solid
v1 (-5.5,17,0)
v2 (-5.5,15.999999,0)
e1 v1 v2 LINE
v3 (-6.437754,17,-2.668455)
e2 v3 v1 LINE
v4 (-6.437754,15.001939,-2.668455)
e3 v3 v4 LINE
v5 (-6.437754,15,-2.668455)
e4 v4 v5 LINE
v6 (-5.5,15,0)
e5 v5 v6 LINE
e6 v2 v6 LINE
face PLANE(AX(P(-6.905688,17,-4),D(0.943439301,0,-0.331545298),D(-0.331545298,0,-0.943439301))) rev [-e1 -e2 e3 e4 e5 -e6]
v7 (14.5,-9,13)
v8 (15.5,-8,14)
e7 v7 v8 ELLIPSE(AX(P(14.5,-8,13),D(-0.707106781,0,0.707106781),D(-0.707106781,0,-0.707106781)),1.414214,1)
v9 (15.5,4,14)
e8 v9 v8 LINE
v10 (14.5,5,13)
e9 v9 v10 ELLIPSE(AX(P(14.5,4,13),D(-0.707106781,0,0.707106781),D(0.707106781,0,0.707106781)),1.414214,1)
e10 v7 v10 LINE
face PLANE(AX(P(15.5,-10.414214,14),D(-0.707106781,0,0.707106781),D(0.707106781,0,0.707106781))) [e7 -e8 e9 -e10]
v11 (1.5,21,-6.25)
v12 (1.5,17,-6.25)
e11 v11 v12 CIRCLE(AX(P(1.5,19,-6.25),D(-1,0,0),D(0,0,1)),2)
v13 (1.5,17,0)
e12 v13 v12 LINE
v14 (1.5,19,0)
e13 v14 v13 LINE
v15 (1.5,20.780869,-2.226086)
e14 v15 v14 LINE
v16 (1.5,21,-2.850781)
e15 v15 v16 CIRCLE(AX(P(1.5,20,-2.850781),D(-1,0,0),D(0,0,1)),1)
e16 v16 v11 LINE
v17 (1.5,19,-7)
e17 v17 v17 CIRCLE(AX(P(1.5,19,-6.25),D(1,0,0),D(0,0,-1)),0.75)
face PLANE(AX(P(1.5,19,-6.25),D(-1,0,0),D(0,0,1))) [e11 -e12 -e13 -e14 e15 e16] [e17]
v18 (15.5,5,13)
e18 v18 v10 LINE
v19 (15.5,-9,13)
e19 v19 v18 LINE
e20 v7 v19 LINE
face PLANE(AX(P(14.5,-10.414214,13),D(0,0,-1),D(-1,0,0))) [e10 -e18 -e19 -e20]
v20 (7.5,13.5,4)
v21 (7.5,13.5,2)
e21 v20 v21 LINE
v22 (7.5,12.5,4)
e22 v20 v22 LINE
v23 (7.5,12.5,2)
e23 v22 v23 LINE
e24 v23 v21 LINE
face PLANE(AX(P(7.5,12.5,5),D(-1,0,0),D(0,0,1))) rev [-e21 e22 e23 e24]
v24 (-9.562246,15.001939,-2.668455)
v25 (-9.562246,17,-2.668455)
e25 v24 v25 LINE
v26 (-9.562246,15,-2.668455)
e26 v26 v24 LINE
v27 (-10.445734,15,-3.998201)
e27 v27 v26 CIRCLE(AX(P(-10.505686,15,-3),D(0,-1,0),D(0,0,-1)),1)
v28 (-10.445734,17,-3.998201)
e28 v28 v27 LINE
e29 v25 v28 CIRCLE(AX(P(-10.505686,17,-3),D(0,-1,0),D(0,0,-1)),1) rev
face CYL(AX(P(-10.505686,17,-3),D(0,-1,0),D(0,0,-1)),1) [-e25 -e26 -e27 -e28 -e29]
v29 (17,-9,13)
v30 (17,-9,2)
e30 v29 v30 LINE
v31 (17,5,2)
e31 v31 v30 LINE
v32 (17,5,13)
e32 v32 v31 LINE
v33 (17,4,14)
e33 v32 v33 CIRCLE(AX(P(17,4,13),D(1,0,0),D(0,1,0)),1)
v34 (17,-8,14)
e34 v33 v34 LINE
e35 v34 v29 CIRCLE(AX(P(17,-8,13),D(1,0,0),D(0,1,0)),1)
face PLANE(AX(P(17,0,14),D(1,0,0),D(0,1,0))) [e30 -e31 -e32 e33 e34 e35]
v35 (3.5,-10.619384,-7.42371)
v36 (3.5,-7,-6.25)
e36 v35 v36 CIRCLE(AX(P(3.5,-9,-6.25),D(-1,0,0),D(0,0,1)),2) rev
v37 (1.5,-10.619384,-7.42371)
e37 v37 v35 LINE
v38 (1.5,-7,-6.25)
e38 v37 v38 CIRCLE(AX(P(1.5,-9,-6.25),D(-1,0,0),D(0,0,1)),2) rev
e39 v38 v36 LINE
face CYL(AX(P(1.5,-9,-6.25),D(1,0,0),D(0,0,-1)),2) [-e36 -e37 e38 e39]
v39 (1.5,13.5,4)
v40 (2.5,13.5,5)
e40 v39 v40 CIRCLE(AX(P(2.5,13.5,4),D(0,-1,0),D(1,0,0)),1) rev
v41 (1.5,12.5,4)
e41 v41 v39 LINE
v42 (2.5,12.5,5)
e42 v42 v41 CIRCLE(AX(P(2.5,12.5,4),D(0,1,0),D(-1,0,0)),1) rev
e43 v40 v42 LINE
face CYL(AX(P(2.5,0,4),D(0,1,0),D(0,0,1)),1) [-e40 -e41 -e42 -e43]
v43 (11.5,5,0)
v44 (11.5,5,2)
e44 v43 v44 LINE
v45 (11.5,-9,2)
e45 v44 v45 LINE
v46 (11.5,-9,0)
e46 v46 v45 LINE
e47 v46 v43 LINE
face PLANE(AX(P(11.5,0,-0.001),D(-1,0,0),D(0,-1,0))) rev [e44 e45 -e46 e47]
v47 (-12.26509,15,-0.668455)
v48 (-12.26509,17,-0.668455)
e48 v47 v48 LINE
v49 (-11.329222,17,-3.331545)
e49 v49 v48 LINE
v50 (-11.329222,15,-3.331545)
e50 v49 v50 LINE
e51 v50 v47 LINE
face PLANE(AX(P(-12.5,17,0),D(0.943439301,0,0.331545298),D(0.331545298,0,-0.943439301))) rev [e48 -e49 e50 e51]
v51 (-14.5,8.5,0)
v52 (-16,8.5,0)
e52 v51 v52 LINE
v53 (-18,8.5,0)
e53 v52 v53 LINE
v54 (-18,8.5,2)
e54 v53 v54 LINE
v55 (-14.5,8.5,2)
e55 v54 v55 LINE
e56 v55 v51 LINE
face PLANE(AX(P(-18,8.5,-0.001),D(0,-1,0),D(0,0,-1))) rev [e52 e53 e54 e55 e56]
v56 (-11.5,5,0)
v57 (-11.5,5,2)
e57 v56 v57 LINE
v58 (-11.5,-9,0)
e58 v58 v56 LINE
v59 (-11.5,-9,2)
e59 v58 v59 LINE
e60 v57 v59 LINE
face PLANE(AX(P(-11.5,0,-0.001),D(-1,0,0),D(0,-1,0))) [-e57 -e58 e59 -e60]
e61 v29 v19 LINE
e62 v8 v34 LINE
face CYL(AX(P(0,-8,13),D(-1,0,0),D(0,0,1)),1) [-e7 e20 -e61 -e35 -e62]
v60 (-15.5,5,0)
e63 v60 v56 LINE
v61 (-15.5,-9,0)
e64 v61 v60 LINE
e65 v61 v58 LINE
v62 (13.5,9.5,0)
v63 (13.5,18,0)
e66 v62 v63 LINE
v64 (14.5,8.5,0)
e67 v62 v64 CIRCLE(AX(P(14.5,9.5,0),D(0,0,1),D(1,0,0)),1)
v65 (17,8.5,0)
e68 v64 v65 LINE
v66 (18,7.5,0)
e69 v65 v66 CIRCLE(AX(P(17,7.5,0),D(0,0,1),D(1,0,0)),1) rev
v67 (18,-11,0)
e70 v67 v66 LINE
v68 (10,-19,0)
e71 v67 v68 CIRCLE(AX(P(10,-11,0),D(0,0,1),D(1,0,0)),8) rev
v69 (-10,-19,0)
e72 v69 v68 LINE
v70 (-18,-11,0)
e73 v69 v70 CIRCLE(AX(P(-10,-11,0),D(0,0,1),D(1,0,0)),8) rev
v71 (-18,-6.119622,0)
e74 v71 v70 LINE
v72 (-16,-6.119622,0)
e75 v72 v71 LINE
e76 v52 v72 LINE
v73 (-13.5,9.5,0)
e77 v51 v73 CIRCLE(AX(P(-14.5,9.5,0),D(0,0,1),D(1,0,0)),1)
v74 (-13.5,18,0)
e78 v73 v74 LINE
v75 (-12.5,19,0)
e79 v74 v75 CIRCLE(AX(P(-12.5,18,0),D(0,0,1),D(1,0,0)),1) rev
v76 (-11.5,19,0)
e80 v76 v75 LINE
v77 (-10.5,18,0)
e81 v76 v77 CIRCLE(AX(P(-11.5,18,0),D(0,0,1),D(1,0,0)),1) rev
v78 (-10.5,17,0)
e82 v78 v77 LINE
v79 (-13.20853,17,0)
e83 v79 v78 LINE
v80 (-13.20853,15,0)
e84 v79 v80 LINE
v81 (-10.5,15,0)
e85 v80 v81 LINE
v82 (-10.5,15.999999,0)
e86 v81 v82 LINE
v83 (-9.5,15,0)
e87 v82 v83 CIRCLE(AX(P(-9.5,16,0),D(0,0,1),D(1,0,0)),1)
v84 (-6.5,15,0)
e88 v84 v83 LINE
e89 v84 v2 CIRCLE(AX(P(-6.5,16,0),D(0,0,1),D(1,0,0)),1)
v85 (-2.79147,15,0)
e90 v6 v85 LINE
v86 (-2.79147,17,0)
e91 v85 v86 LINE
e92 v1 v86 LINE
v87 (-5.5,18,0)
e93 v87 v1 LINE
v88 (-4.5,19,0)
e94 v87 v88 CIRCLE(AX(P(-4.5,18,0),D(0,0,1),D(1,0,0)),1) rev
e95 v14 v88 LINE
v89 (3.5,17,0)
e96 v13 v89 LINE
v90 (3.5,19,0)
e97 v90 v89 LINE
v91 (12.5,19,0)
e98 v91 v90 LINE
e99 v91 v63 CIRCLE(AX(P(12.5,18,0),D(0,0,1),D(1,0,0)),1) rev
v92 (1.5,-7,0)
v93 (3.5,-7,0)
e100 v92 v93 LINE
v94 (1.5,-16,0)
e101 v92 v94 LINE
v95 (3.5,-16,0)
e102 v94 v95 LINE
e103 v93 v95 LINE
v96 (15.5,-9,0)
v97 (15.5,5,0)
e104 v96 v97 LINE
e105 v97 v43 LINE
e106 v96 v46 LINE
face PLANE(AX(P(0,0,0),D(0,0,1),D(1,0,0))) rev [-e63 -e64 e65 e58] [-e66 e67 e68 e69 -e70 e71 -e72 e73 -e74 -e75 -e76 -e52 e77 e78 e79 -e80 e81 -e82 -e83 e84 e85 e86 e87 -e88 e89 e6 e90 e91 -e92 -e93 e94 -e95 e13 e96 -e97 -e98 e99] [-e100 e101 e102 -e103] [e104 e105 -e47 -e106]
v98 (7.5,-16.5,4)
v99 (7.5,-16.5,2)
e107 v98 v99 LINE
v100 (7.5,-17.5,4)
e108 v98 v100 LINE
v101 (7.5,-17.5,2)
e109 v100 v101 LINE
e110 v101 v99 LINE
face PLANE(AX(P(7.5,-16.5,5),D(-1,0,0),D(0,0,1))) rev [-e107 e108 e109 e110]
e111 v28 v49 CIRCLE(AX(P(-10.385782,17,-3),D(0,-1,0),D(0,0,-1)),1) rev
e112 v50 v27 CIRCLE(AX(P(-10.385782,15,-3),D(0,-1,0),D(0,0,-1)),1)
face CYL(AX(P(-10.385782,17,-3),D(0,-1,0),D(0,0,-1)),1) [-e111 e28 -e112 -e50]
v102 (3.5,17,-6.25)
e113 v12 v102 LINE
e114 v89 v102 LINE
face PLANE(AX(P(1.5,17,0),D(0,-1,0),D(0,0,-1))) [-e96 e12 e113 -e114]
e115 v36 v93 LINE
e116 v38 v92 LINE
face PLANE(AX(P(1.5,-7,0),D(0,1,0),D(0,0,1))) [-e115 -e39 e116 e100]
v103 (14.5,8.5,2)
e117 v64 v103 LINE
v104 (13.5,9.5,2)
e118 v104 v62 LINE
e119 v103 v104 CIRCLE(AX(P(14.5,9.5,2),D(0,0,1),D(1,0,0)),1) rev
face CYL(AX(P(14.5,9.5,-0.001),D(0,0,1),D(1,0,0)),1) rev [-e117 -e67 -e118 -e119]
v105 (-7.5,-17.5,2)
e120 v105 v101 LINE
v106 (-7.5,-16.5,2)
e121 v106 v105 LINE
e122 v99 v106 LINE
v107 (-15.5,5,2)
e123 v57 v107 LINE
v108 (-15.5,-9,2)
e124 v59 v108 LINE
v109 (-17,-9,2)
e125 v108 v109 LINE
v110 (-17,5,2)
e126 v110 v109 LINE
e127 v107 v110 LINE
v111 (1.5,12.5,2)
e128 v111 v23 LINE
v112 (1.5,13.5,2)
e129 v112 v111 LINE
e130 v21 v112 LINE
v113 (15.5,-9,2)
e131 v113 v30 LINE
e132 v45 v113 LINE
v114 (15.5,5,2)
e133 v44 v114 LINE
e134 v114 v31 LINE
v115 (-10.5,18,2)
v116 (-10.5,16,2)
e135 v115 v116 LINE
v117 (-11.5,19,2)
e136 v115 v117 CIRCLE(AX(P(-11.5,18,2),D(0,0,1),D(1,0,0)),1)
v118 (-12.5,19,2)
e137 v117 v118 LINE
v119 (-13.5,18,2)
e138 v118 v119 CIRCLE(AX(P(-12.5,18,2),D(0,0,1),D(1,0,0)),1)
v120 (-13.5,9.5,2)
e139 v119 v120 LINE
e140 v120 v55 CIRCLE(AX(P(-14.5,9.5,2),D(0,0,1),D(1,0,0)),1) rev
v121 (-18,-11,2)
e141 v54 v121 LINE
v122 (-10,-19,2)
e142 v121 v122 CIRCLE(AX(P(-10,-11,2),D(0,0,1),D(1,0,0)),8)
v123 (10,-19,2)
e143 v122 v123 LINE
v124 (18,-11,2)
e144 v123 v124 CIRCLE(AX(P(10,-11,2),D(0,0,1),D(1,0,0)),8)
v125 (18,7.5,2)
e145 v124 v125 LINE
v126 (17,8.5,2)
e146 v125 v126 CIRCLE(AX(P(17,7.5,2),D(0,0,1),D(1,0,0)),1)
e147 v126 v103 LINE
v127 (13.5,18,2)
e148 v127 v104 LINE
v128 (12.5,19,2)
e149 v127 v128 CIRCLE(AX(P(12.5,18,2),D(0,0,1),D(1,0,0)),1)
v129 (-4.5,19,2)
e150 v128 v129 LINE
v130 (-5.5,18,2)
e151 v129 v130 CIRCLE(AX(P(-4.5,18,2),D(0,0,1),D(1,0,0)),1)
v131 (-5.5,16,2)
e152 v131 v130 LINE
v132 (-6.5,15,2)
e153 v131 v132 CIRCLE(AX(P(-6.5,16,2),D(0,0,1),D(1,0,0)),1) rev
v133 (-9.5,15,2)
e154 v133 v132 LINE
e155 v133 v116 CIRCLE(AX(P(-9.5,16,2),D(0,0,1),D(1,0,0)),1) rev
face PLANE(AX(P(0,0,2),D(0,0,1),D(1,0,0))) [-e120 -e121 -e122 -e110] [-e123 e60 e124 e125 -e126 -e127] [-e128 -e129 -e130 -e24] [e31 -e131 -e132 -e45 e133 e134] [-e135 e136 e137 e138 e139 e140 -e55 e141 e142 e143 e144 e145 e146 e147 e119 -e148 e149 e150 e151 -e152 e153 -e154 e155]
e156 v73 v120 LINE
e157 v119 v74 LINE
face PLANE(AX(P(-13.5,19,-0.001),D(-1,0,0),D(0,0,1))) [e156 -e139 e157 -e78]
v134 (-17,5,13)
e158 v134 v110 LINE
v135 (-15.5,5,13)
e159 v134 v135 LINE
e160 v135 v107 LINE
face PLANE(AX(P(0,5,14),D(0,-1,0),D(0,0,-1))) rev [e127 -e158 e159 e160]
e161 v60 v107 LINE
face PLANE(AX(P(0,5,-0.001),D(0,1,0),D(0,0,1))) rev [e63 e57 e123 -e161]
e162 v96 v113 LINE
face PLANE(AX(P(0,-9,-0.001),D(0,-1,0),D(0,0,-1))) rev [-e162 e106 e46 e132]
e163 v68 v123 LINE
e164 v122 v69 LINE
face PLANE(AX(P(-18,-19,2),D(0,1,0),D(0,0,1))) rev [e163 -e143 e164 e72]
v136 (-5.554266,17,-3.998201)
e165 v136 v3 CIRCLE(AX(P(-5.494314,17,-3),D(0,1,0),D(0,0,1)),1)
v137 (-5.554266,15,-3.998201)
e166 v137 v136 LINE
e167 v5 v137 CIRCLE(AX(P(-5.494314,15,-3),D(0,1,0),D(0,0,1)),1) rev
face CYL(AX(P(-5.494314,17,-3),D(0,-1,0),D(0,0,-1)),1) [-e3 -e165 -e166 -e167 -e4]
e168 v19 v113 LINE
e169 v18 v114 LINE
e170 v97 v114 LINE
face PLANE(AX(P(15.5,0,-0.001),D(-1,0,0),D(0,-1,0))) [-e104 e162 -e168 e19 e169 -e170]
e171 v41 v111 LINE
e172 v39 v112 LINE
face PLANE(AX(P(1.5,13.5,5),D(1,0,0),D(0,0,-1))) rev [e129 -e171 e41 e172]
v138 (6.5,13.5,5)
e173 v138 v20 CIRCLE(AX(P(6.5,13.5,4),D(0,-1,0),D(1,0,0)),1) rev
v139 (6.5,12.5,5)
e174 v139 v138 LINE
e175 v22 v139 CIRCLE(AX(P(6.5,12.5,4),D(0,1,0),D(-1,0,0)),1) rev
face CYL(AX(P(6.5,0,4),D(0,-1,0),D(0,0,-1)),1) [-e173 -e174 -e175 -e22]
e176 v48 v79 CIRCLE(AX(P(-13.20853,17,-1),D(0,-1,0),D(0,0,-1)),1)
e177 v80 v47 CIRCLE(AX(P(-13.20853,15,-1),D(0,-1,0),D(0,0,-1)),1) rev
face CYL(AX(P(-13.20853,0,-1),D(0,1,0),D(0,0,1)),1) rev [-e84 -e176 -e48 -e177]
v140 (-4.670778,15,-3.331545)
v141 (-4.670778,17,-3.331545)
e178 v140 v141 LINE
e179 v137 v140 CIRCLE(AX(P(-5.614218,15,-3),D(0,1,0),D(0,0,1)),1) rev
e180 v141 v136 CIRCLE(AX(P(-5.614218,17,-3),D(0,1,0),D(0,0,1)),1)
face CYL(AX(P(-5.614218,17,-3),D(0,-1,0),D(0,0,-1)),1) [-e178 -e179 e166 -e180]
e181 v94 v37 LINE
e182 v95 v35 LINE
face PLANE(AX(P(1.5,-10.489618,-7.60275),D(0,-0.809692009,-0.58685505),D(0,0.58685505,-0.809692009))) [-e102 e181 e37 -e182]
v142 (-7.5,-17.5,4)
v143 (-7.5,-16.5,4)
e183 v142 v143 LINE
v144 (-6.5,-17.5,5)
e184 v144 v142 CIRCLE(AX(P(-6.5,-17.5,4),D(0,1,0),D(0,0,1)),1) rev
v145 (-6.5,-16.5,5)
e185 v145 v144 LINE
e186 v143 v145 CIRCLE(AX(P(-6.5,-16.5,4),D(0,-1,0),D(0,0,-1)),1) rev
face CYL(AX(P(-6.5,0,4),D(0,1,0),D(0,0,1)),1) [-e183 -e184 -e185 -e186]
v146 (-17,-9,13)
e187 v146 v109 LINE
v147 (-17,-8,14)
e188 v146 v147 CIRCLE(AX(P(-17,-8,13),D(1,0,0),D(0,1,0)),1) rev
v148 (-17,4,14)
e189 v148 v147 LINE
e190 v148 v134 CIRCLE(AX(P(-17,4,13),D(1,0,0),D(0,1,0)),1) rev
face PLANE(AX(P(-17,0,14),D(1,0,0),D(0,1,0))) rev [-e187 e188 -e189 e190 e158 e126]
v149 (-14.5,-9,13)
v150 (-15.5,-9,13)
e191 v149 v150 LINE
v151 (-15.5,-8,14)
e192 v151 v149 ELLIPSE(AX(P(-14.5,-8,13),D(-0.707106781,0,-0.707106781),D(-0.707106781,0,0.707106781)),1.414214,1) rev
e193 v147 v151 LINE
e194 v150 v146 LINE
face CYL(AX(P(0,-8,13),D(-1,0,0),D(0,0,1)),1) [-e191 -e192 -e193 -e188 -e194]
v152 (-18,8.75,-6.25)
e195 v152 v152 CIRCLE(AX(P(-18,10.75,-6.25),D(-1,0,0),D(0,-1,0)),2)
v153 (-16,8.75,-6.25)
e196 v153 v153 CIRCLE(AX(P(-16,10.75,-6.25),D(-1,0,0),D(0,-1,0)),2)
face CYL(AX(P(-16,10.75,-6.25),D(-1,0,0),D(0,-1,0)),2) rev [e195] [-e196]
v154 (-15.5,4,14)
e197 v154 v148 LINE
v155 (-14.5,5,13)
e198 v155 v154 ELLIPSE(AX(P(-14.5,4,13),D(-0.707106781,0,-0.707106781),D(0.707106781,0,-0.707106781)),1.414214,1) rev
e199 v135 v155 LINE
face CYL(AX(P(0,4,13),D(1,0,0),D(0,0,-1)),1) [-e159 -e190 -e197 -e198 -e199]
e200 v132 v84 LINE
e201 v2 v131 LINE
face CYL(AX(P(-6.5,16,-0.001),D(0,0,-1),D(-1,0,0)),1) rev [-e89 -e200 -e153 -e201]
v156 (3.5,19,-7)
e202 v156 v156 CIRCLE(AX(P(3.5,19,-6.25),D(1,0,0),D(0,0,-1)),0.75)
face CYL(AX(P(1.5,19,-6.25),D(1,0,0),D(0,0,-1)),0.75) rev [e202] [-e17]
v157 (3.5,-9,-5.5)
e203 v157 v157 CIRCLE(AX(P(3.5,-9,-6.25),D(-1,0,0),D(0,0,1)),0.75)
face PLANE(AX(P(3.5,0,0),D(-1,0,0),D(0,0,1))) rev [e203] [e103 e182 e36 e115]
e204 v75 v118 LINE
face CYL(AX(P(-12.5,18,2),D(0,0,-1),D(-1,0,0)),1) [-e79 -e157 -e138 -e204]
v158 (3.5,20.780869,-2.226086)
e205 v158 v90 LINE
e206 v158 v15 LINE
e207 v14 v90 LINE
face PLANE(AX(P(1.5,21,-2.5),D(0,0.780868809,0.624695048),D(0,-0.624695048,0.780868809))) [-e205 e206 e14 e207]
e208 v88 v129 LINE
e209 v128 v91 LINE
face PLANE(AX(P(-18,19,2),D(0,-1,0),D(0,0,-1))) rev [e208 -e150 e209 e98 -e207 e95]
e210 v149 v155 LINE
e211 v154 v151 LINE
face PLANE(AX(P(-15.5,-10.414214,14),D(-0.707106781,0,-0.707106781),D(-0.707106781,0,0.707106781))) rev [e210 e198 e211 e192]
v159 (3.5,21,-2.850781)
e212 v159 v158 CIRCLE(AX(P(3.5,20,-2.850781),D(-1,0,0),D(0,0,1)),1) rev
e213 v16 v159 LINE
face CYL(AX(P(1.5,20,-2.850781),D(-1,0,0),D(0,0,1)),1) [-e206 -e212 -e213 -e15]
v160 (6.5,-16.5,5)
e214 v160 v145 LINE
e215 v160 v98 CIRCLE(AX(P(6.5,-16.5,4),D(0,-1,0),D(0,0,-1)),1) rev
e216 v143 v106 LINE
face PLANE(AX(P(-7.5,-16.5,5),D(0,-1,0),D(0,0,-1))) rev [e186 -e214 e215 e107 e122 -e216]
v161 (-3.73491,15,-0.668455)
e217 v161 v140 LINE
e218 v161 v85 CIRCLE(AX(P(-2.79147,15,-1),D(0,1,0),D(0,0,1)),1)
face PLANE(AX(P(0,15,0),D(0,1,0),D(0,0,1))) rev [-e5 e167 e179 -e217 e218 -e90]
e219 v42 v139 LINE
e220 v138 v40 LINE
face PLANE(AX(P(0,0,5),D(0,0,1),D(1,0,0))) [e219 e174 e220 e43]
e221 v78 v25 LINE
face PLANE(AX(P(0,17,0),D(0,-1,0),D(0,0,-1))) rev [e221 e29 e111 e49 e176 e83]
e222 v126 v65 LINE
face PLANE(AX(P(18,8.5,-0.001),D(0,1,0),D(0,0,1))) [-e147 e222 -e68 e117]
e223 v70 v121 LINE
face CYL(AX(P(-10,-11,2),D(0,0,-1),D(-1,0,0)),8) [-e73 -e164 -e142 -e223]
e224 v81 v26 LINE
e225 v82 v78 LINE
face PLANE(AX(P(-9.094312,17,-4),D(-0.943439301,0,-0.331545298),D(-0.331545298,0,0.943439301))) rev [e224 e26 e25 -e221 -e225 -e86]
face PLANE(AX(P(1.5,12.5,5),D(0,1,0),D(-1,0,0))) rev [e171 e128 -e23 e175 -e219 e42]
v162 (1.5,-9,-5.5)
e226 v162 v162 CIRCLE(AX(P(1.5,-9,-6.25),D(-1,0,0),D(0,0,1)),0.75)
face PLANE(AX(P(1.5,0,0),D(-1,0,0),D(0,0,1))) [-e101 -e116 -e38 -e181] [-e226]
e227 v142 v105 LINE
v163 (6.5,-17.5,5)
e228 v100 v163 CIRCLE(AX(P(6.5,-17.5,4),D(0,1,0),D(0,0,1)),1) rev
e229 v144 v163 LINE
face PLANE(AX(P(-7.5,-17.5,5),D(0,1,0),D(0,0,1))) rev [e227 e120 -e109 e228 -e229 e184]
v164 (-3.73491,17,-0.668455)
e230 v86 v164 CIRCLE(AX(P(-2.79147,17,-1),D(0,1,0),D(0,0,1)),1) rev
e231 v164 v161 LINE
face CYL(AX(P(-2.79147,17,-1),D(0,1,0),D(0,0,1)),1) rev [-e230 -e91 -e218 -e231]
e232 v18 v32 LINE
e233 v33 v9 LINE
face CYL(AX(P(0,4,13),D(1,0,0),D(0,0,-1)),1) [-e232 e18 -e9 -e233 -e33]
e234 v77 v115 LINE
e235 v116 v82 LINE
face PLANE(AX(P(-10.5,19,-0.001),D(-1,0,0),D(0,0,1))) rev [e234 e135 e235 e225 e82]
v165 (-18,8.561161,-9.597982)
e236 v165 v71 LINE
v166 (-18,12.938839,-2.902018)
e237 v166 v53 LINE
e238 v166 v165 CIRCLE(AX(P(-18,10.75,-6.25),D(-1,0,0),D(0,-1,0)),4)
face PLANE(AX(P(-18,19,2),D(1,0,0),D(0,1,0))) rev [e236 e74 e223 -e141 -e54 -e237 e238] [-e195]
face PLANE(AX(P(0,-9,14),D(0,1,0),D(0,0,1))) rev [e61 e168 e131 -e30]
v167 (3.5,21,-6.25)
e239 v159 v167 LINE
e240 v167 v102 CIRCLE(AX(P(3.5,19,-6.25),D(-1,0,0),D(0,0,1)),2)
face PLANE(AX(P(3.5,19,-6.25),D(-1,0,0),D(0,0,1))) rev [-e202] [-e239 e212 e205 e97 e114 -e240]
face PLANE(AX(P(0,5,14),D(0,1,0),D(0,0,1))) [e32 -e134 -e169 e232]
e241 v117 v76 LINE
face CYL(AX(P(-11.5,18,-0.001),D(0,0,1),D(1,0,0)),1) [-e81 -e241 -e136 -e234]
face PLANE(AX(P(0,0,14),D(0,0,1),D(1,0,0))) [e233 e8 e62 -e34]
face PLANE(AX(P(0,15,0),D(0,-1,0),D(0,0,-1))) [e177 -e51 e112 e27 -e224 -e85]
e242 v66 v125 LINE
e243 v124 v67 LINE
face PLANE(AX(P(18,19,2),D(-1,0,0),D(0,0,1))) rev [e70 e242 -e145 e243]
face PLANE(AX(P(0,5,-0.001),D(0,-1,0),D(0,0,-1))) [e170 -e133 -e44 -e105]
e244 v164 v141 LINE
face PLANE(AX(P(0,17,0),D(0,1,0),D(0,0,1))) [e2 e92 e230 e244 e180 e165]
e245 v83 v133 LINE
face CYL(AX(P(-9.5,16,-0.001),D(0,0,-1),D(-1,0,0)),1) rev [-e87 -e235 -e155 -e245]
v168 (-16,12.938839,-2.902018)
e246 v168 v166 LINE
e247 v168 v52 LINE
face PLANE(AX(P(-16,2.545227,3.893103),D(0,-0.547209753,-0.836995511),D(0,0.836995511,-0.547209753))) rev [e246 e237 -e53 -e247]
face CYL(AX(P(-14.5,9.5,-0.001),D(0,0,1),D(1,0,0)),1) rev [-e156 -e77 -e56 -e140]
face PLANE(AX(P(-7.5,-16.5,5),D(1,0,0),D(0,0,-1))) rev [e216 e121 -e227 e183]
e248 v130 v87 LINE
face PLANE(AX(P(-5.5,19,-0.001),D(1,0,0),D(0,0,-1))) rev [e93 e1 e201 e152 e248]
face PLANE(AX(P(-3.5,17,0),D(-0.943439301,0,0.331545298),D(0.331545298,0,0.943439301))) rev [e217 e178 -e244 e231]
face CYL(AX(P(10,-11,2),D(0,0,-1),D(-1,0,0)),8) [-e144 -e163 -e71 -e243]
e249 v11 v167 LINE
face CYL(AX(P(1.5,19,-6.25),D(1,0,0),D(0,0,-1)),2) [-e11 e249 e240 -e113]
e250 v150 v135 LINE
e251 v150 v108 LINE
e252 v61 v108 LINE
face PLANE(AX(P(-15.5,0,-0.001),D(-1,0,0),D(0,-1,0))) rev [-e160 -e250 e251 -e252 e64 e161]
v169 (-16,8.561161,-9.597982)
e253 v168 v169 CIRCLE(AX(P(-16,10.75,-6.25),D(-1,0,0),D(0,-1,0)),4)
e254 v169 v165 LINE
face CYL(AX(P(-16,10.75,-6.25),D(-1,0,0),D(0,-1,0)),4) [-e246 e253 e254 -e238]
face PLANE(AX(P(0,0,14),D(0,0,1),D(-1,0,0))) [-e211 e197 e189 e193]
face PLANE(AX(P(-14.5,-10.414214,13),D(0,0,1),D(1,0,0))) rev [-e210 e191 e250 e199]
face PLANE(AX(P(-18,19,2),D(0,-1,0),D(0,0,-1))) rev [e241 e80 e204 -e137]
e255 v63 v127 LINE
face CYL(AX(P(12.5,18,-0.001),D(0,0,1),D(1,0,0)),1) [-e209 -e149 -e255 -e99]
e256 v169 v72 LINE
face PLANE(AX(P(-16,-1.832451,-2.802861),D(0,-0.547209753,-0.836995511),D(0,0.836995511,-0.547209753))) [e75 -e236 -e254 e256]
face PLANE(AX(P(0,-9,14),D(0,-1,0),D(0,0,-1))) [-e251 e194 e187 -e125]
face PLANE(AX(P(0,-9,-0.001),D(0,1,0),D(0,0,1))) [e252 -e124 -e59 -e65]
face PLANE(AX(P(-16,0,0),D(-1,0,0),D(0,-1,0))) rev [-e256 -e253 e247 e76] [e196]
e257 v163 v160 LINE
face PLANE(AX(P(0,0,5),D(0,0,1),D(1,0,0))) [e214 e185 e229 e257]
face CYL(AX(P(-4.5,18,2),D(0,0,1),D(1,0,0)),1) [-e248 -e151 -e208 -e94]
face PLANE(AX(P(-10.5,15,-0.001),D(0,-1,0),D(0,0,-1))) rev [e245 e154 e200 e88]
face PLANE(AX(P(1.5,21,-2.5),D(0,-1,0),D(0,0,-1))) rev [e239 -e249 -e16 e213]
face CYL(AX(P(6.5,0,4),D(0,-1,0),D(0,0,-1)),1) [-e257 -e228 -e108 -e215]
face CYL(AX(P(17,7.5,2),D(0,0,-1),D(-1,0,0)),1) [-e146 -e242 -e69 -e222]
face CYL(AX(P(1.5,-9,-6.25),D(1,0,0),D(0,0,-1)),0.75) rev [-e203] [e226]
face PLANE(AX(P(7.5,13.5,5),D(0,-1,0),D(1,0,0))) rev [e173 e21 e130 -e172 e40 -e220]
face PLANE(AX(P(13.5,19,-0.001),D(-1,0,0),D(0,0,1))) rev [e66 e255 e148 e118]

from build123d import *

# Parameters (mm, degrees)
SKETCH_1_W          = 36
SKETCH_1_H          = 38
EXTRUDE_1_DEPTH     = 2
CUT_EXTRUDE_1_REACH = 28.249
SKETCH_2_W          = 4
SKETCH_2_H          = 14
SKETCH_2_W_2        = 4.5
SKETCH_2_H_2        = 10.5
SKETCH_2_3_W        = 1.5
SKETCH_2_3_H        = 14
EXTRUDE_2_DEPTH     = 12
EXTRUDE_3_DEPTH     = 14
SKETCH_4_W          = 15
SKETCH_4_H          = 1
SKETCH_4_W_2        = 6
EXTRUDE_4_DEPTH     = 3
CUT_EXTRUDE_2_REACH = 30.792
SKETCH_5_W          = 5
SKETCH_5_H          = 4
SKETCH_6_R          = 0.75
EXTRUDE_5_DEPTH     = 2
SKETCH_7_R          = 2
EXTRUDE_6_DEPTH     = 2
EXTRUDE_7_DEPTH     = 2
FILLET_1_R          = 8
FILLET_2_R          = 1


with BuildPart() as part:
    # 草图1 → 凸台-拉伸1 (new body)
    with BuildSketch(Plane.XY):
        Rectangle(SKETCH_1_W, SKETCH_1_H)
    extrude(amount=EXTRUDE_1_DEPTH)

    # 草图2 → 切除-拉伸1 (cut, up to next)
    with BuildSketch(Plane.XY.offset(2), mode=Mode.PRIVATE) as cut_extrude_1_sk1:
        with Locations((13.5, -2)):
            Rectangle(SKETCH_2_W, SKETCH_2_H)
    cut_extrude_1_tool1 = extrude(cut_extrude_1_sk1.sketch, amount=-CUT_EXTRUDE_1_REACH, mode=Mode.PRIVATE) & part.part
    # 草图2 → 切除-拉伸1 (cut, up to next)
    with BuildSketch(Plane.XY.offset(2), mode=Mode.PRIVATE) as cut_extrude_1_sk2:
        with Locations((15.75, 13.75)):
            Rectangle(SKETCH_2_W_2, SKETCH_2_H_2)
    cut_extrude_1_tool2 = extrude(cut_extrude_1_sk2.sketch, amount=-CUT_EXTRUDE_1_REACH, mode=Mode.PRIVATE) & part.part
    cut_extrude_1_1 = cut_extrude_1_tool1.solids().sort_by_distance((13.5, -2, 2))[0]
    add(cut_extrude_1_1, mode=Mode.SUBTRACT)
    cut_extrude_1_2 = cut_extrude_1_tool2.solids().sort_by_distance((15.75, 13.75, 2))[0]
    add(cut_extrude_1_2, mode=Mode.SUBTRACT)
    cut_extrude_1 = cut_extrude_1_1 + cut_extrude_1_2  # 切除-拉伸1 as one shape, for the pattern or mirror that repeats it

    # 草图2<3> → 凸台-拉伸2 (add)
    with BuildSketch(Plane.XY.offset(2)):
        with Locations((16.25, -2)):
            Rectangle(SKETCH_2_3_W, SKETCH_2_3_H)
    extrude_2 = extrude(amount=EXTRUDE_2_DEPTH)

    # 草图3 → 凸台-拉伸3 (add)
    with BuildSketch(Plane(origin=(0, 5, 0), x_dir=(1, 0, 0), z_dir=(0, 1, 0))):
        Polygon((15.5, -14), (14.5, -13), (15.5, -13), align=None)
    extrude_3 = extrude(amount=-EXTRUDE_3_DEPTH)

    # 镜向1: 切除-拉伸1, 凸台-拉伸2, 凸台-拉伸3 across plane
    add(cut_extrude_1.mirror(Plane(origin=(0, 0, 0), x_dir=(0, 0, 1), z_dir=(1, 0, 0))), mode=Mode.SUBTRACT)
    add(extrude_2.mirror(Plane(origin=(0, 0, 0), x_dir=(0, 0, 1), z_dir=(1, 0, 0))))
    add(extrude_3.mirror(Plane(origin=(0, 0, 0), x_dir=(0, 0, 1), z_dir=(1, 0, 0))))

    # 草图4 → 凸台-拉伸4 (add)
    with BuildSketch(Plane.XY.offset(2)):
        with Locations((0, -17)):
            Rectangle(SKETCH_4_W, SKETCH_4_H)
        with Locations((4.5, 13)):
            Rectangle(SKETCH_4_W_2, SKETCH_4_H)
    extrude(amount=EXTRUDE_4_DEPTH)

    # 草图5 → 切除-拉伸2 (cut, up to next)
    with BuildSketch(Plane.XY.offset(2), mode=Mode.PRIVATE) as cut_extrude_2_sk1:
        with Locations((-8, 17)):
            Rectangle(SKETCH_5_W, SKETCH_5_H)
    cut_extrude_2_tool1 = extrude(cut_extrude_2_sk1.sketch, amount=-CUT_EXTRUDE_2_REACH, mode=Mode.PRIVATE) & part.part
    add(cut_extrude_2_tool1.solids().sort_by_distance((-8, 17, 2))[0], mode=Mode.SUBTRACT)

    # 草图6 → 凸台-拉伸5 (add)
    # profile 1 of 2: a face of its own
    with BuildSketch(Plane(origin=(3.5, 0, 0), x_dir=(0, 0, -1), z_dir=(1, 0, 0))):
        with BuildLine():
            Line((2.5, 21), (0, 19))
            Line((0, 19), (0, 17))
            Line((0, 17), (6.25, 17))
            ThreePointArc((6.25, 17), (8.25, 19), (6.25, 21))
            Line((6.25, 21), (2.5, 21))
        make_face()
        with Locations((6.25, 19)):
            Circle(SKETCH_6_R, mode=Mode.SUBTRACT)
    # profile 2 of 2: a face of its own
    with BuildSketch(Plane(origin=(3.5, 0, 0), x_dir=(0, 0, -1), z_dir=(1, 0, 0))):
        with BuildLine():
            ThreePointArc((7.423710101, -10.619384019), (8.152467876, -8.383059175), (6.25, -7))
            Line((6.25, -7), (0, -7))
            Line((0, -7), (0, -16))
            Line((0, -16), (7.423710101, -10.619384019))
        make_face()
        with Locations(Location((6.25, -9, 0), (0, 0, 180))):
            Circle(SKETCH_6_R, mode=Mode.SUBTRACT)
    extrude(amount=-EXTRUDE_5_DEPTH)

    # 草图7 → 凸台-拉伸6 (add)
    with BuildSketch(Plane.ZY.offset(18)):
        with BuildLine():
            Line((0, -6.119622458), (0, 8.5))
            Line((0, 8.5), (-2.902017955, 12.938839014))
            ThreePointArc((-2.902017955, 12.938839014), (-8.438839014, 14.097982045), (-9.597982045, 8.561160986))
            Line((-9.597982045, 8.561160986), (0, -6.119622458))
        make_face()
        with Locations(Location((-6.25, 10.75, 0), (0, 0, 270))):
            Circle(SKETCH_7_R, mode=Mode.SUBTRACT)
    extrude(amount=-EXTRUDE_6_DEPTH)

    # 草图8 → 凸台-拉伸7 (add)
    with BuildSketch(Plane(origin=(0, 15, 0), x_dir=(1, 0, 0), z_dir=(0, 1, 0))):
        Polygon((-10.5, 0), (-12.5, 0), (-11.09431212, 4), (-9.09431212, 4), align=None)
        Polygon((-4.90568788, 4), (-6.90568788, 4), (-5.5, 0), (-3.5, 0), align=None)
    extrude(amount=EXTRUDE_7_DEPTH)

    # 圆角1
    fillet_1_edges = [part.edges().sort_by_distance(p)[0] for p in [
        (18, -19, 1),
        (-18, -19, 1),
    ]]
    fillet(fillet_1_edges, radius=FILLET_1_R)

    # 圆角2
    # the kernel refuses this fillet: 1 mm, written as the material it adds along each edge
    with BuildSketch(Plane(origin=(-13.5, 8.5, 2), x_dir=(-1, 0, 0), z_dir=(0, 0, -1)), Plane(origin=(-10.5, 15, 2), x_dir=(0, 1, 0), z_dir=(0, 0, -1)), Plane(origin=(-5.5, 15, 2), x_dir=(-1, 0, 0), z_dir=(0, 0, -1))) as fillet_2_piece_1:
        with BuildLine():
            CenterArc((FILLET_2_R, FILLET_2_R), FILLET_2_R, 180, 90)
            Line((0, FILLET_2_R), (0, 0))
            Line((0, 0), (FILLET_2_R, 0))
        make_face()
    extrude(amount=2)
    with BuildSketch(Plane(origin=(-12.5, 15, 0), x_dir=(-1, 0, 0), z_dir=(0, 1, 0))) as fillet_2_piece_2:
        with BuildLine():
            CenterArc((FILLET_2_R * 0.708529633191, -FILLET_2_R), FILLET_2_R, 90, 70.63740436)
            Line((-FILLET_2_R * 0.234909668247, -FILLET_2_R * 0.668454702186), (0, 0))
            Line((0, 0), (FILLET_2_R * 0.708529633191, 0))
        make_face()
    extrude(amount=2)
    with BuildSketch(Plane(origin=(-3.5, 15, 0), x_dir=(1, 0, 0), z_dir=(0, 1, 0))) as fillet_2_piece_3:
        with BuildLine():
            CenterArc((FILLET_2_R * 0.708529633191, FILLET_2_R), FILLET_2_R, 199.36259564, 70.63740436)
            Line((-FILLET_2_R * 0.234909668247, FILLET_2_R * 0.668454702186), (0, 0))
            Line((0, 0), (FILLET_2_R * 0.708529633191, 0))
        make_face()
    extrude(amount=2)
    with BuildSketch(Plane(origin=(13.5, 8.5, 2), x_dir=(1, 0, 0), z_dir=(0, 0, -1))) as fillet_2_piece_4:
        with BuildLine():
            CenterArc((FILLET_2_R, -FILLET_2_R), FILLET_2_R, 90, 90)
            Line((0, -FILLET_2_R), (0, 0))
            Line((0, 0), (FILLET_2_R, 0))
        make_face()
    extrude(amount=2)
    # the kernel refuses this fillet: 1 mm, written as the material it takes off along each edge
    with BuildSketch(Plane(origin=(19.5, -9, 14), x_dir=(0, 1, 0), z_dir=(-1, 0, 0)), Plane(origin=(13, 5, 14), x_dir=(0, -1, 0), z_dir=(1, 0, 0)), Plane(origin=(-19.5, -9, 14), x_dir=(0, 0, -1), z_dir=(1, 0, 0))) as fillet_2_2_piece_1:
        with BuildLine():
            CenterArc((FILLET_2_R, FILLET_2_R), FILLET_2_R, 180, 90)
            Line((0, FILLET_2_R), (0, 0))
            Line((0, 0), (FILLET_2_R, 0))
        make_face()
    extrude(amount=6.5, mode=Mode.SUBTRACT)
    with BuildSketch(Plane(origin=(-13, 5, 14), x_dir=(0, -1, 0), z_dir=(-1, 0, 0))) as fillet_2_2_piece_2:
        with BuildLine():
            CenterArc((FILLET_2_R, -FILLET_2_R), FILLET_2_R, 90, 90)
            Line((0, -FILLET_2_R), (0, 0))
            Line((0, 0), (FILLET_2_R, 0))
        make_face()
    extrude(amount=6.5, mode=Mode.SUBTRACT)
    with BuildSketch(Plane(origin=(-7.5, -20, 5), x_dir=(1, 0, 0), z_dir=(0, 1, 0)), Plane(origin=(1.5, 16, 5), x_dir=(0, 0, -1), z_dir=(0, -1, 0))) as fillet_2_2_piece_3:
        with BuildLine():
            CenterArc((FILLET_2_R, FILLET_2_R), FILLET_2_R, 180, 90)
            Line((0, FILLET_2_R), (0, 0))
            Line((0, 0), (FILLET_2_R, 0))
        make_face()
    extrude(amount=6, mode=Mode.SUBTRACT)
    with BuildSketch(Plane(origin=(7.5, -14, 5), x_dir=(0, 0, -1), z_dir=(0, -1, 0)), Plane(origin=(7.5, 10, 5), x_dir=(-1, 0, 0), z_dir=(0, 1, 0))) as fillet_2_2_piece_4:
        with BuildLine():
            CenterArc((FILLET_2_R, -FILLET_2_R), FILLET_2_R, 90, 90)
            Line((0, -FILLET_2_R), (0, 0))
            Line((0, 0), (FILLET_2_R, 0))
        make_face()
    extrude(amount=6, mode=Mode.SUBTRACT)
    with BuildSketch(Plane(origin=(-13.5, 19, 4.5), x_dir=(1, 0, 0), z_dir=(0, 0, -1)), Plane(origin=(-10.5, 19, 4.5), x_dir=(0, -1, 0), z_dir=(0, 0, -1)), Plane(origin=(-5.5, 19, 4.5), x_dir=(1, 0, 0), z_dir=(0, 0, -1)), Plane(origin=(18, 8.5, 4.5), x_dir=(0, -1, 0), z_dir=(0, 0, -1)), Plane(origin=(13.5, 19, 4.5), x_dir=(0, -1, 0), z_dir=(0, 0, -1))) as fillet_2_2_piece_5:
        with BuildLine():
            CenterArc((FILLET_2_R, FILLET_2_R), FILLET_2_R, 180, 90)
            Line((0, FILLET_2_R), (0, 0))
            Line((0, 0), (FILLET_2_R, 0))
        make_face()
    extrude(amount=7, mode=Mode.SUBTRACT)
    with BuildSketch(Plane(origin=(-4.90568788, 13.228675917, -4), x_dir=(0.33154529781413966, 0, 0.9434393014377414), z_dir=(0, 1, 0)), Plane(origin=(-11.09431212, 13.228675917, -4), x_dir=(1, 0, 0), z_dir=(0, 1, 0))) as fillet_2_2_piece_6:
        with BuildLine():
            CenterArc((FILLET_2_R * 0.708529633191, -FILLET_2_R), FILLET_2_R, 90, 70.63740436)
            Line((-FILLET_2_R * 0.234909668247, -FILLET_2_R * 0.668454702186), (0, 0))
            Line((0, 0), (FILLET_2_R * 0.708529633191, 0))
        make_face()
    extrude(amount=5.542648166, mode=Mode.SUBTRACT)
    with BuildSketch(Plane(origin=(-9.09431212, 11.471566067, -4), x_dir=(-0.33154529781413894, 0, 0.9434393014377417), z_dir=(0, 1, 0)), Plane(origin=(-6.90568788, 11.471566067, -4), x_dir=(1, 0, 0), z_dir=(0, 1, 0))) as fillet_2_2_piece_7:
        with BuildLine():
            CenterArc((FILLET_2_R * 1.41137357304, -FILLET_2_R), FILLET_2_R, 90, 109.36259564)
            Line((FILLET_2_R * 0.4679342716, -FILLET_2_R * 1.33154529781), (0, 0))
            Line((0, 0), (FILLET_2_R * 1.41137357304, 0))
        make_face()
    extrude(amount=9.056867865, mode=Mode.SUBTRACT)
    with BuildSketch(Plane(origin=(4.376952648, 21, -2.5), x_dir=(0, -0.6246950475544217, 0.7808688094430323), z_dir=(-1, 0, 0))) as fillet_2_2_piece_8:
        with BuildLine():
            CenterArc((FILLET_2_R * 0.350781059358, -FILLET_2_R), FILLET_2_R, 90, 38.659808254)
            Line((-FILLET_2_R * 0.273913988196, -FILLET_2_R * 0.219131190557), (0, 0))
            Line((0, 0), (FILLET_2_R * 0.350781059358, 0))
        make_face()
    extrude(amount=3.753905297, mode=Mode.SUBTRACT)


solid = part.part
